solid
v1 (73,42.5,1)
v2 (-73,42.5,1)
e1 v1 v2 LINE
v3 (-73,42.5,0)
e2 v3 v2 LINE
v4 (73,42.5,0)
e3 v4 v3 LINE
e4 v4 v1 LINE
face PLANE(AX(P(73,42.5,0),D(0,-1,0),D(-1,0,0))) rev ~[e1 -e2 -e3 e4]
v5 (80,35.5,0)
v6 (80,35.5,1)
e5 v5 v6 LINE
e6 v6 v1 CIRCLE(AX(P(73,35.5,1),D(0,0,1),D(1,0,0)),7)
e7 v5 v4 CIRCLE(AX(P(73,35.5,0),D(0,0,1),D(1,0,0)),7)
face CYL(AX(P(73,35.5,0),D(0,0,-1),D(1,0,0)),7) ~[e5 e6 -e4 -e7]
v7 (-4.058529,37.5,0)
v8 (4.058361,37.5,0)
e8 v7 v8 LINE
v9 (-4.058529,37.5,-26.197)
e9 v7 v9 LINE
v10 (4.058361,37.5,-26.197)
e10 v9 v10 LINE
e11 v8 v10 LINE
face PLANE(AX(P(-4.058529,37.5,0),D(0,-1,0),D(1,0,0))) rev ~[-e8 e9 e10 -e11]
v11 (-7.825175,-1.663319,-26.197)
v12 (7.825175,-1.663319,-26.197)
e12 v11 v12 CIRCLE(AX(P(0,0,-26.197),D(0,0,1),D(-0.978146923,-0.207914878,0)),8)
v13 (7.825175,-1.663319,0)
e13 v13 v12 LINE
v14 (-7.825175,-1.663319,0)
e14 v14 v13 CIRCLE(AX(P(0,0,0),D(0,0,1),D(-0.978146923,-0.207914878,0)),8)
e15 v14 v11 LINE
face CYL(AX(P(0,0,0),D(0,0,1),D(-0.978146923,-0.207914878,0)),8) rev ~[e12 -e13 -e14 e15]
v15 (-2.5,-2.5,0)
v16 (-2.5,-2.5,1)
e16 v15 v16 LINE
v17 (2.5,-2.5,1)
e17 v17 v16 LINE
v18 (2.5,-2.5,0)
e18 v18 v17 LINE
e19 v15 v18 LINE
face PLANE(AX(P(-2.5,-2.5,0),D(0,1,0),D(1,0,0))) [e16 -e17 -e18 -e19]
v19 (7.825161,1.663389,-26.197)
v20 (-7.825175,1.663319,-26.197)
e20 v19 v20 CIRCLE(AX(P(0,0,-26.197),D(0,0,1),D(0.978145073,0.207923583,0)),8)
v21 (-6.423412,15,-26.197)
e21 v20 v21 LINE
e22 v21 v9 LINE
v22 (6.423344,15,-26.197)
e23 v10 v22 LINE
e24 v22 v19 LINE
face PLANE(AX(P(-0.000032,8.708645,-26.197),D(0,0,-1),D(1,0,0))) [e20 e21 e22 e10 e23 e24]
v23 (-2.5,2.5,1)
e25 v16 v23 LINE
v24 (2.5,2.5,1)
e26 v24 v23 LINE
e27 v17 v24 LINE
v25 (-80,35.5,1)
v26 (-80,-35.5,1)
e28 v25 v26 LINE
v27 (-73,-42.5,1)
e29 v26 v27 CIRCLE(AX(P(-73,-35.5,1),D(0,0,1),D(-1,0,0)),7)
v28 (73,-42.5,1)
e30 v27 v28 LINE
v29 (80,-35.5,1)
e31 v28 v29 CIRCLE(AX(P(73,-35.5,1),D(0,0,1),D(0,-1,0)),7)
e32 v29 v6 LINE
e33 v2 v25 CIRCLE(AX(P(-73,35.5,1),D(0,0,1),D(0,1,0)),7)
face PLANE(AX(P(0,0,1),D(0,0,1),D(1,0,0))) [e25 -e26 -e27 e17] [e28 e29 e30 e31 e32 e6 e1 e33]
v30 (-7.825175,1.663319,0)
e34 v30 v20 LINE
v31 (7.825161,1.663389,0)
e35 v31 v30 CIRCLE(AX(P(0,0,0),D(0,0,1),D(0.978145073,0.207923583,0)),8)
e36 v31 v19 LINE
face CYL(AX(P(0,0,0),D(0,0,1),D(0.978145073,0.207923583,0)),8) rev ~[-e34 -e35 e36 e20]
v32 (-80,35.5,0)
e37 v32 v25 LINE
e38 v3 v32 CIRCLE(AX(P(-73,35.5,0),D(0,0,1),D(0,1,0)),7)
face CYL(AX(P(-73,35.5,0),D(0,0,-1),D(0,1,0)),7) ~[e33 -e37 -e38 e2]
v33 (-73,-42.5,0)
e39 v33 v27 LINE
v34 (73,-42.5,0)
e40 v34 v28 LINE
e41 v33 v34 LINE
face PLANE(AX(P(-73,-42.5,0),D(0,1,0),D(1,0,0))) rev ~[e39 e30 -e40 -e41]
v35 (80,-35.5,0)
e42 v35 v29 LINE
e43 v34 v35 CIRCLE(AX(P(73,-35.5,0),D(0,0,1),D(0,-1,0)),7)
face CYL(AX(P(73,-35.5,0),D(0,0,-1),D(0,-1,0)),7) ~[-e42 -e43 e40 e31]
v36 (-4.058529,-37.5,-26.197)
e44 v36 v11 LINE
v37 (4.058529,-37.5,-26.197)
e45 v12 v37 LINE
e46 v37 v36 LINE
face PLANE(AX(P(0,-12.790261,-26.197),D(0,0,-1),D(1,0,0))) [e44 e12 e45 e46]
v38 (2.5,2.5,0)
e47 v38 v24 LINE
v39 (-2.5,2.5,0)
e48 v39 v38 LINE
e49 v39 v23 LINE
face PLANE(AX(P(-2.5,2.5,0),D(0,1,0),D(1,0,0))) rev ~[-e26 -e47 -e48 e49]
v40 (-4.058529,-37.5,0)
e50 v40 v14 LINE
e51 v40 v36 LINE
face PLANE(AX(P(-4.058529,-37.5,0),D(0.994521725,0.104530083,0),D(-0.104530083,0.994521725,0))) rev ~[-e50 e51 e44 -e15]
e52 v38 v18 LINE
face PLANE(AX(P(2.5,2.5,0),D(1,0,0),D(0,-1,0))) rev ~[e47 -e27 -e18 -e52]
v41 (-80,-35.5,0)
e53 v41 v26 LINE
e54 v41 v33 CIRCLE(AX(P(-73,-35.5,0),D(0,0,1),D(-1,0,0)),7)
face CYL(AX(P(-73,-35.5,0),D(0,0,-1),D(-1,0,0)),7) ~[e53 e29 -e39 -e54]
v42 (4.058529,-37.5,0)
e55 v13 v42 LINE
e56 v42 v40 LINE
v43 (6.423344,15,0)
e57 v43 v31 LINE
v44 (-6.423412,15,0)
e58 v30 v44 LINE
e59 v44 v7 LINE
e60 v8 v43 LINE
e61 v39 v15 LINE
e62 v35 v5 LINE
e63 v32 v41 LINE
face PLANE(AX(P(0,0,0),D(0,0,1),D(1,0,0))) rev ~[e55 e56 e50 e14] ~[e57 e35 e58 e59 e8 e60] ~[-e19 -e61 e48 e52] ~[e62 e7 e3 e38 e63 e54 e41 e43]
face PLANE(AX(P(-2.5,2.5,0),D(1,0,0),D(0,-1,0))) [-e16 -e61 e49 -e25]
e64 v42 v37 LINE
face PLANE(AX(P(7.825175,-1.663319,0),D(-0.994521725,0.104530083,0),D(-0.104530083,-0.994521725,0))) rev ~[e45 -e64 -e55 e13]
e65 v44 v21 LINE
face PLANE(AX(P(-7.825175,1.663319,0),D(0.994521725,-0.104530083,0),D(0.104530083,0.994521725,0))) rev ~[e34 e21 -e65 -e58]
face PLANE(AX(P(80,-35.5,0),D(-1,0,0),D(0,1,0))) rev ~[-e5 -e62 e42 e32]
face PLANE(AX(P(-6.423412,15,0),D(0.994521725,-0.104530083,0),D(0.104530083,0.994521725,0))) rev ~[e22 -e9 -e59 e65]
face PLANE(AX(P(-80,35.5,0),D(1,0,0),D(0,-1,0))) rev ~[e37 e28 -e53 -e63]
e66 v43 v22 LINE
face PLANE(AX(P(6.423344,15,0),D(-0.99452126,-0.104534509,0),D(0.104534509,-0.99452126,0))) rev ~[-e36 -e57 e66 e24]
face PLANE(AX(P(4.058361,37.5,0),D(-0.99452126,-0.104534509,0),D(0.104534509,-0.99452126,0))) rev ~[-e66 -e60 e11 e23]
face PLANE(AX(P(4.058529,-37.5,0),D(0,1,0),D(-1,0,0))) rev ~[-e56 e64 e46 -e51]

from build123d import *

# Parameters (mm, degrees)
F0_R     = 8
F1_DEPTH = 1
F4_W     = 5
F4_H     = 5
F5_DEPTH = 25
F6_DEPTH = 26.197


with BuildPart() as f1:
    # F0 (on Top) → F1 (new body)
    with BuildSketch(Plane.XY):
        with BuildLine():
            Line((-73, -42.5), (73, -42.5))
            ThreePointArc((73, -42.5), (77.9497474683, -40.4497474683), (80, -35.5))
            Line((80, -35.5), (80, 35.5))
            ThreePointArc((80, 35.5), (77.9497474683, 40.4497474683), (73, 42.5))
            Line((73, 42.5), (-73, 42.5))
            ThreePointArc((-73, 42.5), (-77.9497474683, 40.4497474683), (-80, 35.5))
            Line((-80, 35.5), (-80, -35.5))
            ThreePointArc((-80, -35.5), (-77.9497474683, -40.4497474683), (-73, -42.5))
        make_face()
        Circle(F0_R, mode=Mode.SUBTRACT)
        Circle(F0_R)
    extrude(amount=F1_DEPTH)

    # F4 (on face) → F5 (cut)
    with BuildSketch(Plane(origin=(0, 0, 0), x_dir=(1, 0, 0), z_dir=(0, 0, -1))):
        Rectangle(F4_W, F4_H)
    extrude(amount=-F5_DEPTH, mode=Mode.SUBTRACT)

    # F3 (on face) → F6 (join)
    with BuildSketch(Plane(origin=(0, 0, 0), x_dir=(1, 0, 0), z_dir=(0, 0, -1))):
        with BuildLine():
            ThreePointArc((-7.8251753865, 1.6633190224), (0, 8), (7.8251753865, 1.6633190224))
            Line((7.8251753865, 1.6633190224), (5.3723529412, 25))
            Line((5.3723529412, 25), (-5.3723529412, 25))
            Line((-5.3723529412, 25), (-7.8251753865, 1.6633190224))
        make_face()
        with BuildLine():
            Line((6.4233442804, -15), (7.8251605833, -1.6633886632))
            ThreePointArc((7.8251605833, -1.6633886632), (-3.55984e-05, -7.9999999999), (-7.8251753865, -1.6633190224))
            Line((-7.8251753865, -1.6633190224), (-6.4234117647, -15))
            Line((-6.4234117647, -15), (3.0757090009, -15))
            Line((3.0757090009, -15), (6.4233442804, -15))
        make_face()
        Polygon((-5.3723529412, 25), (5.3723529412, 25), (4.0585294118, 37.5), (-4.0585294118, 37.5), align=None)
        Polygon((4.0583607009, -37.5), (6.4233442804, -15), (3.0757090009, -15), (-6.4234117647, -15), (-4.0585294118, -37.5), align=None)
    extrude(amount=F6_DEPTH)


solid = f1.part
